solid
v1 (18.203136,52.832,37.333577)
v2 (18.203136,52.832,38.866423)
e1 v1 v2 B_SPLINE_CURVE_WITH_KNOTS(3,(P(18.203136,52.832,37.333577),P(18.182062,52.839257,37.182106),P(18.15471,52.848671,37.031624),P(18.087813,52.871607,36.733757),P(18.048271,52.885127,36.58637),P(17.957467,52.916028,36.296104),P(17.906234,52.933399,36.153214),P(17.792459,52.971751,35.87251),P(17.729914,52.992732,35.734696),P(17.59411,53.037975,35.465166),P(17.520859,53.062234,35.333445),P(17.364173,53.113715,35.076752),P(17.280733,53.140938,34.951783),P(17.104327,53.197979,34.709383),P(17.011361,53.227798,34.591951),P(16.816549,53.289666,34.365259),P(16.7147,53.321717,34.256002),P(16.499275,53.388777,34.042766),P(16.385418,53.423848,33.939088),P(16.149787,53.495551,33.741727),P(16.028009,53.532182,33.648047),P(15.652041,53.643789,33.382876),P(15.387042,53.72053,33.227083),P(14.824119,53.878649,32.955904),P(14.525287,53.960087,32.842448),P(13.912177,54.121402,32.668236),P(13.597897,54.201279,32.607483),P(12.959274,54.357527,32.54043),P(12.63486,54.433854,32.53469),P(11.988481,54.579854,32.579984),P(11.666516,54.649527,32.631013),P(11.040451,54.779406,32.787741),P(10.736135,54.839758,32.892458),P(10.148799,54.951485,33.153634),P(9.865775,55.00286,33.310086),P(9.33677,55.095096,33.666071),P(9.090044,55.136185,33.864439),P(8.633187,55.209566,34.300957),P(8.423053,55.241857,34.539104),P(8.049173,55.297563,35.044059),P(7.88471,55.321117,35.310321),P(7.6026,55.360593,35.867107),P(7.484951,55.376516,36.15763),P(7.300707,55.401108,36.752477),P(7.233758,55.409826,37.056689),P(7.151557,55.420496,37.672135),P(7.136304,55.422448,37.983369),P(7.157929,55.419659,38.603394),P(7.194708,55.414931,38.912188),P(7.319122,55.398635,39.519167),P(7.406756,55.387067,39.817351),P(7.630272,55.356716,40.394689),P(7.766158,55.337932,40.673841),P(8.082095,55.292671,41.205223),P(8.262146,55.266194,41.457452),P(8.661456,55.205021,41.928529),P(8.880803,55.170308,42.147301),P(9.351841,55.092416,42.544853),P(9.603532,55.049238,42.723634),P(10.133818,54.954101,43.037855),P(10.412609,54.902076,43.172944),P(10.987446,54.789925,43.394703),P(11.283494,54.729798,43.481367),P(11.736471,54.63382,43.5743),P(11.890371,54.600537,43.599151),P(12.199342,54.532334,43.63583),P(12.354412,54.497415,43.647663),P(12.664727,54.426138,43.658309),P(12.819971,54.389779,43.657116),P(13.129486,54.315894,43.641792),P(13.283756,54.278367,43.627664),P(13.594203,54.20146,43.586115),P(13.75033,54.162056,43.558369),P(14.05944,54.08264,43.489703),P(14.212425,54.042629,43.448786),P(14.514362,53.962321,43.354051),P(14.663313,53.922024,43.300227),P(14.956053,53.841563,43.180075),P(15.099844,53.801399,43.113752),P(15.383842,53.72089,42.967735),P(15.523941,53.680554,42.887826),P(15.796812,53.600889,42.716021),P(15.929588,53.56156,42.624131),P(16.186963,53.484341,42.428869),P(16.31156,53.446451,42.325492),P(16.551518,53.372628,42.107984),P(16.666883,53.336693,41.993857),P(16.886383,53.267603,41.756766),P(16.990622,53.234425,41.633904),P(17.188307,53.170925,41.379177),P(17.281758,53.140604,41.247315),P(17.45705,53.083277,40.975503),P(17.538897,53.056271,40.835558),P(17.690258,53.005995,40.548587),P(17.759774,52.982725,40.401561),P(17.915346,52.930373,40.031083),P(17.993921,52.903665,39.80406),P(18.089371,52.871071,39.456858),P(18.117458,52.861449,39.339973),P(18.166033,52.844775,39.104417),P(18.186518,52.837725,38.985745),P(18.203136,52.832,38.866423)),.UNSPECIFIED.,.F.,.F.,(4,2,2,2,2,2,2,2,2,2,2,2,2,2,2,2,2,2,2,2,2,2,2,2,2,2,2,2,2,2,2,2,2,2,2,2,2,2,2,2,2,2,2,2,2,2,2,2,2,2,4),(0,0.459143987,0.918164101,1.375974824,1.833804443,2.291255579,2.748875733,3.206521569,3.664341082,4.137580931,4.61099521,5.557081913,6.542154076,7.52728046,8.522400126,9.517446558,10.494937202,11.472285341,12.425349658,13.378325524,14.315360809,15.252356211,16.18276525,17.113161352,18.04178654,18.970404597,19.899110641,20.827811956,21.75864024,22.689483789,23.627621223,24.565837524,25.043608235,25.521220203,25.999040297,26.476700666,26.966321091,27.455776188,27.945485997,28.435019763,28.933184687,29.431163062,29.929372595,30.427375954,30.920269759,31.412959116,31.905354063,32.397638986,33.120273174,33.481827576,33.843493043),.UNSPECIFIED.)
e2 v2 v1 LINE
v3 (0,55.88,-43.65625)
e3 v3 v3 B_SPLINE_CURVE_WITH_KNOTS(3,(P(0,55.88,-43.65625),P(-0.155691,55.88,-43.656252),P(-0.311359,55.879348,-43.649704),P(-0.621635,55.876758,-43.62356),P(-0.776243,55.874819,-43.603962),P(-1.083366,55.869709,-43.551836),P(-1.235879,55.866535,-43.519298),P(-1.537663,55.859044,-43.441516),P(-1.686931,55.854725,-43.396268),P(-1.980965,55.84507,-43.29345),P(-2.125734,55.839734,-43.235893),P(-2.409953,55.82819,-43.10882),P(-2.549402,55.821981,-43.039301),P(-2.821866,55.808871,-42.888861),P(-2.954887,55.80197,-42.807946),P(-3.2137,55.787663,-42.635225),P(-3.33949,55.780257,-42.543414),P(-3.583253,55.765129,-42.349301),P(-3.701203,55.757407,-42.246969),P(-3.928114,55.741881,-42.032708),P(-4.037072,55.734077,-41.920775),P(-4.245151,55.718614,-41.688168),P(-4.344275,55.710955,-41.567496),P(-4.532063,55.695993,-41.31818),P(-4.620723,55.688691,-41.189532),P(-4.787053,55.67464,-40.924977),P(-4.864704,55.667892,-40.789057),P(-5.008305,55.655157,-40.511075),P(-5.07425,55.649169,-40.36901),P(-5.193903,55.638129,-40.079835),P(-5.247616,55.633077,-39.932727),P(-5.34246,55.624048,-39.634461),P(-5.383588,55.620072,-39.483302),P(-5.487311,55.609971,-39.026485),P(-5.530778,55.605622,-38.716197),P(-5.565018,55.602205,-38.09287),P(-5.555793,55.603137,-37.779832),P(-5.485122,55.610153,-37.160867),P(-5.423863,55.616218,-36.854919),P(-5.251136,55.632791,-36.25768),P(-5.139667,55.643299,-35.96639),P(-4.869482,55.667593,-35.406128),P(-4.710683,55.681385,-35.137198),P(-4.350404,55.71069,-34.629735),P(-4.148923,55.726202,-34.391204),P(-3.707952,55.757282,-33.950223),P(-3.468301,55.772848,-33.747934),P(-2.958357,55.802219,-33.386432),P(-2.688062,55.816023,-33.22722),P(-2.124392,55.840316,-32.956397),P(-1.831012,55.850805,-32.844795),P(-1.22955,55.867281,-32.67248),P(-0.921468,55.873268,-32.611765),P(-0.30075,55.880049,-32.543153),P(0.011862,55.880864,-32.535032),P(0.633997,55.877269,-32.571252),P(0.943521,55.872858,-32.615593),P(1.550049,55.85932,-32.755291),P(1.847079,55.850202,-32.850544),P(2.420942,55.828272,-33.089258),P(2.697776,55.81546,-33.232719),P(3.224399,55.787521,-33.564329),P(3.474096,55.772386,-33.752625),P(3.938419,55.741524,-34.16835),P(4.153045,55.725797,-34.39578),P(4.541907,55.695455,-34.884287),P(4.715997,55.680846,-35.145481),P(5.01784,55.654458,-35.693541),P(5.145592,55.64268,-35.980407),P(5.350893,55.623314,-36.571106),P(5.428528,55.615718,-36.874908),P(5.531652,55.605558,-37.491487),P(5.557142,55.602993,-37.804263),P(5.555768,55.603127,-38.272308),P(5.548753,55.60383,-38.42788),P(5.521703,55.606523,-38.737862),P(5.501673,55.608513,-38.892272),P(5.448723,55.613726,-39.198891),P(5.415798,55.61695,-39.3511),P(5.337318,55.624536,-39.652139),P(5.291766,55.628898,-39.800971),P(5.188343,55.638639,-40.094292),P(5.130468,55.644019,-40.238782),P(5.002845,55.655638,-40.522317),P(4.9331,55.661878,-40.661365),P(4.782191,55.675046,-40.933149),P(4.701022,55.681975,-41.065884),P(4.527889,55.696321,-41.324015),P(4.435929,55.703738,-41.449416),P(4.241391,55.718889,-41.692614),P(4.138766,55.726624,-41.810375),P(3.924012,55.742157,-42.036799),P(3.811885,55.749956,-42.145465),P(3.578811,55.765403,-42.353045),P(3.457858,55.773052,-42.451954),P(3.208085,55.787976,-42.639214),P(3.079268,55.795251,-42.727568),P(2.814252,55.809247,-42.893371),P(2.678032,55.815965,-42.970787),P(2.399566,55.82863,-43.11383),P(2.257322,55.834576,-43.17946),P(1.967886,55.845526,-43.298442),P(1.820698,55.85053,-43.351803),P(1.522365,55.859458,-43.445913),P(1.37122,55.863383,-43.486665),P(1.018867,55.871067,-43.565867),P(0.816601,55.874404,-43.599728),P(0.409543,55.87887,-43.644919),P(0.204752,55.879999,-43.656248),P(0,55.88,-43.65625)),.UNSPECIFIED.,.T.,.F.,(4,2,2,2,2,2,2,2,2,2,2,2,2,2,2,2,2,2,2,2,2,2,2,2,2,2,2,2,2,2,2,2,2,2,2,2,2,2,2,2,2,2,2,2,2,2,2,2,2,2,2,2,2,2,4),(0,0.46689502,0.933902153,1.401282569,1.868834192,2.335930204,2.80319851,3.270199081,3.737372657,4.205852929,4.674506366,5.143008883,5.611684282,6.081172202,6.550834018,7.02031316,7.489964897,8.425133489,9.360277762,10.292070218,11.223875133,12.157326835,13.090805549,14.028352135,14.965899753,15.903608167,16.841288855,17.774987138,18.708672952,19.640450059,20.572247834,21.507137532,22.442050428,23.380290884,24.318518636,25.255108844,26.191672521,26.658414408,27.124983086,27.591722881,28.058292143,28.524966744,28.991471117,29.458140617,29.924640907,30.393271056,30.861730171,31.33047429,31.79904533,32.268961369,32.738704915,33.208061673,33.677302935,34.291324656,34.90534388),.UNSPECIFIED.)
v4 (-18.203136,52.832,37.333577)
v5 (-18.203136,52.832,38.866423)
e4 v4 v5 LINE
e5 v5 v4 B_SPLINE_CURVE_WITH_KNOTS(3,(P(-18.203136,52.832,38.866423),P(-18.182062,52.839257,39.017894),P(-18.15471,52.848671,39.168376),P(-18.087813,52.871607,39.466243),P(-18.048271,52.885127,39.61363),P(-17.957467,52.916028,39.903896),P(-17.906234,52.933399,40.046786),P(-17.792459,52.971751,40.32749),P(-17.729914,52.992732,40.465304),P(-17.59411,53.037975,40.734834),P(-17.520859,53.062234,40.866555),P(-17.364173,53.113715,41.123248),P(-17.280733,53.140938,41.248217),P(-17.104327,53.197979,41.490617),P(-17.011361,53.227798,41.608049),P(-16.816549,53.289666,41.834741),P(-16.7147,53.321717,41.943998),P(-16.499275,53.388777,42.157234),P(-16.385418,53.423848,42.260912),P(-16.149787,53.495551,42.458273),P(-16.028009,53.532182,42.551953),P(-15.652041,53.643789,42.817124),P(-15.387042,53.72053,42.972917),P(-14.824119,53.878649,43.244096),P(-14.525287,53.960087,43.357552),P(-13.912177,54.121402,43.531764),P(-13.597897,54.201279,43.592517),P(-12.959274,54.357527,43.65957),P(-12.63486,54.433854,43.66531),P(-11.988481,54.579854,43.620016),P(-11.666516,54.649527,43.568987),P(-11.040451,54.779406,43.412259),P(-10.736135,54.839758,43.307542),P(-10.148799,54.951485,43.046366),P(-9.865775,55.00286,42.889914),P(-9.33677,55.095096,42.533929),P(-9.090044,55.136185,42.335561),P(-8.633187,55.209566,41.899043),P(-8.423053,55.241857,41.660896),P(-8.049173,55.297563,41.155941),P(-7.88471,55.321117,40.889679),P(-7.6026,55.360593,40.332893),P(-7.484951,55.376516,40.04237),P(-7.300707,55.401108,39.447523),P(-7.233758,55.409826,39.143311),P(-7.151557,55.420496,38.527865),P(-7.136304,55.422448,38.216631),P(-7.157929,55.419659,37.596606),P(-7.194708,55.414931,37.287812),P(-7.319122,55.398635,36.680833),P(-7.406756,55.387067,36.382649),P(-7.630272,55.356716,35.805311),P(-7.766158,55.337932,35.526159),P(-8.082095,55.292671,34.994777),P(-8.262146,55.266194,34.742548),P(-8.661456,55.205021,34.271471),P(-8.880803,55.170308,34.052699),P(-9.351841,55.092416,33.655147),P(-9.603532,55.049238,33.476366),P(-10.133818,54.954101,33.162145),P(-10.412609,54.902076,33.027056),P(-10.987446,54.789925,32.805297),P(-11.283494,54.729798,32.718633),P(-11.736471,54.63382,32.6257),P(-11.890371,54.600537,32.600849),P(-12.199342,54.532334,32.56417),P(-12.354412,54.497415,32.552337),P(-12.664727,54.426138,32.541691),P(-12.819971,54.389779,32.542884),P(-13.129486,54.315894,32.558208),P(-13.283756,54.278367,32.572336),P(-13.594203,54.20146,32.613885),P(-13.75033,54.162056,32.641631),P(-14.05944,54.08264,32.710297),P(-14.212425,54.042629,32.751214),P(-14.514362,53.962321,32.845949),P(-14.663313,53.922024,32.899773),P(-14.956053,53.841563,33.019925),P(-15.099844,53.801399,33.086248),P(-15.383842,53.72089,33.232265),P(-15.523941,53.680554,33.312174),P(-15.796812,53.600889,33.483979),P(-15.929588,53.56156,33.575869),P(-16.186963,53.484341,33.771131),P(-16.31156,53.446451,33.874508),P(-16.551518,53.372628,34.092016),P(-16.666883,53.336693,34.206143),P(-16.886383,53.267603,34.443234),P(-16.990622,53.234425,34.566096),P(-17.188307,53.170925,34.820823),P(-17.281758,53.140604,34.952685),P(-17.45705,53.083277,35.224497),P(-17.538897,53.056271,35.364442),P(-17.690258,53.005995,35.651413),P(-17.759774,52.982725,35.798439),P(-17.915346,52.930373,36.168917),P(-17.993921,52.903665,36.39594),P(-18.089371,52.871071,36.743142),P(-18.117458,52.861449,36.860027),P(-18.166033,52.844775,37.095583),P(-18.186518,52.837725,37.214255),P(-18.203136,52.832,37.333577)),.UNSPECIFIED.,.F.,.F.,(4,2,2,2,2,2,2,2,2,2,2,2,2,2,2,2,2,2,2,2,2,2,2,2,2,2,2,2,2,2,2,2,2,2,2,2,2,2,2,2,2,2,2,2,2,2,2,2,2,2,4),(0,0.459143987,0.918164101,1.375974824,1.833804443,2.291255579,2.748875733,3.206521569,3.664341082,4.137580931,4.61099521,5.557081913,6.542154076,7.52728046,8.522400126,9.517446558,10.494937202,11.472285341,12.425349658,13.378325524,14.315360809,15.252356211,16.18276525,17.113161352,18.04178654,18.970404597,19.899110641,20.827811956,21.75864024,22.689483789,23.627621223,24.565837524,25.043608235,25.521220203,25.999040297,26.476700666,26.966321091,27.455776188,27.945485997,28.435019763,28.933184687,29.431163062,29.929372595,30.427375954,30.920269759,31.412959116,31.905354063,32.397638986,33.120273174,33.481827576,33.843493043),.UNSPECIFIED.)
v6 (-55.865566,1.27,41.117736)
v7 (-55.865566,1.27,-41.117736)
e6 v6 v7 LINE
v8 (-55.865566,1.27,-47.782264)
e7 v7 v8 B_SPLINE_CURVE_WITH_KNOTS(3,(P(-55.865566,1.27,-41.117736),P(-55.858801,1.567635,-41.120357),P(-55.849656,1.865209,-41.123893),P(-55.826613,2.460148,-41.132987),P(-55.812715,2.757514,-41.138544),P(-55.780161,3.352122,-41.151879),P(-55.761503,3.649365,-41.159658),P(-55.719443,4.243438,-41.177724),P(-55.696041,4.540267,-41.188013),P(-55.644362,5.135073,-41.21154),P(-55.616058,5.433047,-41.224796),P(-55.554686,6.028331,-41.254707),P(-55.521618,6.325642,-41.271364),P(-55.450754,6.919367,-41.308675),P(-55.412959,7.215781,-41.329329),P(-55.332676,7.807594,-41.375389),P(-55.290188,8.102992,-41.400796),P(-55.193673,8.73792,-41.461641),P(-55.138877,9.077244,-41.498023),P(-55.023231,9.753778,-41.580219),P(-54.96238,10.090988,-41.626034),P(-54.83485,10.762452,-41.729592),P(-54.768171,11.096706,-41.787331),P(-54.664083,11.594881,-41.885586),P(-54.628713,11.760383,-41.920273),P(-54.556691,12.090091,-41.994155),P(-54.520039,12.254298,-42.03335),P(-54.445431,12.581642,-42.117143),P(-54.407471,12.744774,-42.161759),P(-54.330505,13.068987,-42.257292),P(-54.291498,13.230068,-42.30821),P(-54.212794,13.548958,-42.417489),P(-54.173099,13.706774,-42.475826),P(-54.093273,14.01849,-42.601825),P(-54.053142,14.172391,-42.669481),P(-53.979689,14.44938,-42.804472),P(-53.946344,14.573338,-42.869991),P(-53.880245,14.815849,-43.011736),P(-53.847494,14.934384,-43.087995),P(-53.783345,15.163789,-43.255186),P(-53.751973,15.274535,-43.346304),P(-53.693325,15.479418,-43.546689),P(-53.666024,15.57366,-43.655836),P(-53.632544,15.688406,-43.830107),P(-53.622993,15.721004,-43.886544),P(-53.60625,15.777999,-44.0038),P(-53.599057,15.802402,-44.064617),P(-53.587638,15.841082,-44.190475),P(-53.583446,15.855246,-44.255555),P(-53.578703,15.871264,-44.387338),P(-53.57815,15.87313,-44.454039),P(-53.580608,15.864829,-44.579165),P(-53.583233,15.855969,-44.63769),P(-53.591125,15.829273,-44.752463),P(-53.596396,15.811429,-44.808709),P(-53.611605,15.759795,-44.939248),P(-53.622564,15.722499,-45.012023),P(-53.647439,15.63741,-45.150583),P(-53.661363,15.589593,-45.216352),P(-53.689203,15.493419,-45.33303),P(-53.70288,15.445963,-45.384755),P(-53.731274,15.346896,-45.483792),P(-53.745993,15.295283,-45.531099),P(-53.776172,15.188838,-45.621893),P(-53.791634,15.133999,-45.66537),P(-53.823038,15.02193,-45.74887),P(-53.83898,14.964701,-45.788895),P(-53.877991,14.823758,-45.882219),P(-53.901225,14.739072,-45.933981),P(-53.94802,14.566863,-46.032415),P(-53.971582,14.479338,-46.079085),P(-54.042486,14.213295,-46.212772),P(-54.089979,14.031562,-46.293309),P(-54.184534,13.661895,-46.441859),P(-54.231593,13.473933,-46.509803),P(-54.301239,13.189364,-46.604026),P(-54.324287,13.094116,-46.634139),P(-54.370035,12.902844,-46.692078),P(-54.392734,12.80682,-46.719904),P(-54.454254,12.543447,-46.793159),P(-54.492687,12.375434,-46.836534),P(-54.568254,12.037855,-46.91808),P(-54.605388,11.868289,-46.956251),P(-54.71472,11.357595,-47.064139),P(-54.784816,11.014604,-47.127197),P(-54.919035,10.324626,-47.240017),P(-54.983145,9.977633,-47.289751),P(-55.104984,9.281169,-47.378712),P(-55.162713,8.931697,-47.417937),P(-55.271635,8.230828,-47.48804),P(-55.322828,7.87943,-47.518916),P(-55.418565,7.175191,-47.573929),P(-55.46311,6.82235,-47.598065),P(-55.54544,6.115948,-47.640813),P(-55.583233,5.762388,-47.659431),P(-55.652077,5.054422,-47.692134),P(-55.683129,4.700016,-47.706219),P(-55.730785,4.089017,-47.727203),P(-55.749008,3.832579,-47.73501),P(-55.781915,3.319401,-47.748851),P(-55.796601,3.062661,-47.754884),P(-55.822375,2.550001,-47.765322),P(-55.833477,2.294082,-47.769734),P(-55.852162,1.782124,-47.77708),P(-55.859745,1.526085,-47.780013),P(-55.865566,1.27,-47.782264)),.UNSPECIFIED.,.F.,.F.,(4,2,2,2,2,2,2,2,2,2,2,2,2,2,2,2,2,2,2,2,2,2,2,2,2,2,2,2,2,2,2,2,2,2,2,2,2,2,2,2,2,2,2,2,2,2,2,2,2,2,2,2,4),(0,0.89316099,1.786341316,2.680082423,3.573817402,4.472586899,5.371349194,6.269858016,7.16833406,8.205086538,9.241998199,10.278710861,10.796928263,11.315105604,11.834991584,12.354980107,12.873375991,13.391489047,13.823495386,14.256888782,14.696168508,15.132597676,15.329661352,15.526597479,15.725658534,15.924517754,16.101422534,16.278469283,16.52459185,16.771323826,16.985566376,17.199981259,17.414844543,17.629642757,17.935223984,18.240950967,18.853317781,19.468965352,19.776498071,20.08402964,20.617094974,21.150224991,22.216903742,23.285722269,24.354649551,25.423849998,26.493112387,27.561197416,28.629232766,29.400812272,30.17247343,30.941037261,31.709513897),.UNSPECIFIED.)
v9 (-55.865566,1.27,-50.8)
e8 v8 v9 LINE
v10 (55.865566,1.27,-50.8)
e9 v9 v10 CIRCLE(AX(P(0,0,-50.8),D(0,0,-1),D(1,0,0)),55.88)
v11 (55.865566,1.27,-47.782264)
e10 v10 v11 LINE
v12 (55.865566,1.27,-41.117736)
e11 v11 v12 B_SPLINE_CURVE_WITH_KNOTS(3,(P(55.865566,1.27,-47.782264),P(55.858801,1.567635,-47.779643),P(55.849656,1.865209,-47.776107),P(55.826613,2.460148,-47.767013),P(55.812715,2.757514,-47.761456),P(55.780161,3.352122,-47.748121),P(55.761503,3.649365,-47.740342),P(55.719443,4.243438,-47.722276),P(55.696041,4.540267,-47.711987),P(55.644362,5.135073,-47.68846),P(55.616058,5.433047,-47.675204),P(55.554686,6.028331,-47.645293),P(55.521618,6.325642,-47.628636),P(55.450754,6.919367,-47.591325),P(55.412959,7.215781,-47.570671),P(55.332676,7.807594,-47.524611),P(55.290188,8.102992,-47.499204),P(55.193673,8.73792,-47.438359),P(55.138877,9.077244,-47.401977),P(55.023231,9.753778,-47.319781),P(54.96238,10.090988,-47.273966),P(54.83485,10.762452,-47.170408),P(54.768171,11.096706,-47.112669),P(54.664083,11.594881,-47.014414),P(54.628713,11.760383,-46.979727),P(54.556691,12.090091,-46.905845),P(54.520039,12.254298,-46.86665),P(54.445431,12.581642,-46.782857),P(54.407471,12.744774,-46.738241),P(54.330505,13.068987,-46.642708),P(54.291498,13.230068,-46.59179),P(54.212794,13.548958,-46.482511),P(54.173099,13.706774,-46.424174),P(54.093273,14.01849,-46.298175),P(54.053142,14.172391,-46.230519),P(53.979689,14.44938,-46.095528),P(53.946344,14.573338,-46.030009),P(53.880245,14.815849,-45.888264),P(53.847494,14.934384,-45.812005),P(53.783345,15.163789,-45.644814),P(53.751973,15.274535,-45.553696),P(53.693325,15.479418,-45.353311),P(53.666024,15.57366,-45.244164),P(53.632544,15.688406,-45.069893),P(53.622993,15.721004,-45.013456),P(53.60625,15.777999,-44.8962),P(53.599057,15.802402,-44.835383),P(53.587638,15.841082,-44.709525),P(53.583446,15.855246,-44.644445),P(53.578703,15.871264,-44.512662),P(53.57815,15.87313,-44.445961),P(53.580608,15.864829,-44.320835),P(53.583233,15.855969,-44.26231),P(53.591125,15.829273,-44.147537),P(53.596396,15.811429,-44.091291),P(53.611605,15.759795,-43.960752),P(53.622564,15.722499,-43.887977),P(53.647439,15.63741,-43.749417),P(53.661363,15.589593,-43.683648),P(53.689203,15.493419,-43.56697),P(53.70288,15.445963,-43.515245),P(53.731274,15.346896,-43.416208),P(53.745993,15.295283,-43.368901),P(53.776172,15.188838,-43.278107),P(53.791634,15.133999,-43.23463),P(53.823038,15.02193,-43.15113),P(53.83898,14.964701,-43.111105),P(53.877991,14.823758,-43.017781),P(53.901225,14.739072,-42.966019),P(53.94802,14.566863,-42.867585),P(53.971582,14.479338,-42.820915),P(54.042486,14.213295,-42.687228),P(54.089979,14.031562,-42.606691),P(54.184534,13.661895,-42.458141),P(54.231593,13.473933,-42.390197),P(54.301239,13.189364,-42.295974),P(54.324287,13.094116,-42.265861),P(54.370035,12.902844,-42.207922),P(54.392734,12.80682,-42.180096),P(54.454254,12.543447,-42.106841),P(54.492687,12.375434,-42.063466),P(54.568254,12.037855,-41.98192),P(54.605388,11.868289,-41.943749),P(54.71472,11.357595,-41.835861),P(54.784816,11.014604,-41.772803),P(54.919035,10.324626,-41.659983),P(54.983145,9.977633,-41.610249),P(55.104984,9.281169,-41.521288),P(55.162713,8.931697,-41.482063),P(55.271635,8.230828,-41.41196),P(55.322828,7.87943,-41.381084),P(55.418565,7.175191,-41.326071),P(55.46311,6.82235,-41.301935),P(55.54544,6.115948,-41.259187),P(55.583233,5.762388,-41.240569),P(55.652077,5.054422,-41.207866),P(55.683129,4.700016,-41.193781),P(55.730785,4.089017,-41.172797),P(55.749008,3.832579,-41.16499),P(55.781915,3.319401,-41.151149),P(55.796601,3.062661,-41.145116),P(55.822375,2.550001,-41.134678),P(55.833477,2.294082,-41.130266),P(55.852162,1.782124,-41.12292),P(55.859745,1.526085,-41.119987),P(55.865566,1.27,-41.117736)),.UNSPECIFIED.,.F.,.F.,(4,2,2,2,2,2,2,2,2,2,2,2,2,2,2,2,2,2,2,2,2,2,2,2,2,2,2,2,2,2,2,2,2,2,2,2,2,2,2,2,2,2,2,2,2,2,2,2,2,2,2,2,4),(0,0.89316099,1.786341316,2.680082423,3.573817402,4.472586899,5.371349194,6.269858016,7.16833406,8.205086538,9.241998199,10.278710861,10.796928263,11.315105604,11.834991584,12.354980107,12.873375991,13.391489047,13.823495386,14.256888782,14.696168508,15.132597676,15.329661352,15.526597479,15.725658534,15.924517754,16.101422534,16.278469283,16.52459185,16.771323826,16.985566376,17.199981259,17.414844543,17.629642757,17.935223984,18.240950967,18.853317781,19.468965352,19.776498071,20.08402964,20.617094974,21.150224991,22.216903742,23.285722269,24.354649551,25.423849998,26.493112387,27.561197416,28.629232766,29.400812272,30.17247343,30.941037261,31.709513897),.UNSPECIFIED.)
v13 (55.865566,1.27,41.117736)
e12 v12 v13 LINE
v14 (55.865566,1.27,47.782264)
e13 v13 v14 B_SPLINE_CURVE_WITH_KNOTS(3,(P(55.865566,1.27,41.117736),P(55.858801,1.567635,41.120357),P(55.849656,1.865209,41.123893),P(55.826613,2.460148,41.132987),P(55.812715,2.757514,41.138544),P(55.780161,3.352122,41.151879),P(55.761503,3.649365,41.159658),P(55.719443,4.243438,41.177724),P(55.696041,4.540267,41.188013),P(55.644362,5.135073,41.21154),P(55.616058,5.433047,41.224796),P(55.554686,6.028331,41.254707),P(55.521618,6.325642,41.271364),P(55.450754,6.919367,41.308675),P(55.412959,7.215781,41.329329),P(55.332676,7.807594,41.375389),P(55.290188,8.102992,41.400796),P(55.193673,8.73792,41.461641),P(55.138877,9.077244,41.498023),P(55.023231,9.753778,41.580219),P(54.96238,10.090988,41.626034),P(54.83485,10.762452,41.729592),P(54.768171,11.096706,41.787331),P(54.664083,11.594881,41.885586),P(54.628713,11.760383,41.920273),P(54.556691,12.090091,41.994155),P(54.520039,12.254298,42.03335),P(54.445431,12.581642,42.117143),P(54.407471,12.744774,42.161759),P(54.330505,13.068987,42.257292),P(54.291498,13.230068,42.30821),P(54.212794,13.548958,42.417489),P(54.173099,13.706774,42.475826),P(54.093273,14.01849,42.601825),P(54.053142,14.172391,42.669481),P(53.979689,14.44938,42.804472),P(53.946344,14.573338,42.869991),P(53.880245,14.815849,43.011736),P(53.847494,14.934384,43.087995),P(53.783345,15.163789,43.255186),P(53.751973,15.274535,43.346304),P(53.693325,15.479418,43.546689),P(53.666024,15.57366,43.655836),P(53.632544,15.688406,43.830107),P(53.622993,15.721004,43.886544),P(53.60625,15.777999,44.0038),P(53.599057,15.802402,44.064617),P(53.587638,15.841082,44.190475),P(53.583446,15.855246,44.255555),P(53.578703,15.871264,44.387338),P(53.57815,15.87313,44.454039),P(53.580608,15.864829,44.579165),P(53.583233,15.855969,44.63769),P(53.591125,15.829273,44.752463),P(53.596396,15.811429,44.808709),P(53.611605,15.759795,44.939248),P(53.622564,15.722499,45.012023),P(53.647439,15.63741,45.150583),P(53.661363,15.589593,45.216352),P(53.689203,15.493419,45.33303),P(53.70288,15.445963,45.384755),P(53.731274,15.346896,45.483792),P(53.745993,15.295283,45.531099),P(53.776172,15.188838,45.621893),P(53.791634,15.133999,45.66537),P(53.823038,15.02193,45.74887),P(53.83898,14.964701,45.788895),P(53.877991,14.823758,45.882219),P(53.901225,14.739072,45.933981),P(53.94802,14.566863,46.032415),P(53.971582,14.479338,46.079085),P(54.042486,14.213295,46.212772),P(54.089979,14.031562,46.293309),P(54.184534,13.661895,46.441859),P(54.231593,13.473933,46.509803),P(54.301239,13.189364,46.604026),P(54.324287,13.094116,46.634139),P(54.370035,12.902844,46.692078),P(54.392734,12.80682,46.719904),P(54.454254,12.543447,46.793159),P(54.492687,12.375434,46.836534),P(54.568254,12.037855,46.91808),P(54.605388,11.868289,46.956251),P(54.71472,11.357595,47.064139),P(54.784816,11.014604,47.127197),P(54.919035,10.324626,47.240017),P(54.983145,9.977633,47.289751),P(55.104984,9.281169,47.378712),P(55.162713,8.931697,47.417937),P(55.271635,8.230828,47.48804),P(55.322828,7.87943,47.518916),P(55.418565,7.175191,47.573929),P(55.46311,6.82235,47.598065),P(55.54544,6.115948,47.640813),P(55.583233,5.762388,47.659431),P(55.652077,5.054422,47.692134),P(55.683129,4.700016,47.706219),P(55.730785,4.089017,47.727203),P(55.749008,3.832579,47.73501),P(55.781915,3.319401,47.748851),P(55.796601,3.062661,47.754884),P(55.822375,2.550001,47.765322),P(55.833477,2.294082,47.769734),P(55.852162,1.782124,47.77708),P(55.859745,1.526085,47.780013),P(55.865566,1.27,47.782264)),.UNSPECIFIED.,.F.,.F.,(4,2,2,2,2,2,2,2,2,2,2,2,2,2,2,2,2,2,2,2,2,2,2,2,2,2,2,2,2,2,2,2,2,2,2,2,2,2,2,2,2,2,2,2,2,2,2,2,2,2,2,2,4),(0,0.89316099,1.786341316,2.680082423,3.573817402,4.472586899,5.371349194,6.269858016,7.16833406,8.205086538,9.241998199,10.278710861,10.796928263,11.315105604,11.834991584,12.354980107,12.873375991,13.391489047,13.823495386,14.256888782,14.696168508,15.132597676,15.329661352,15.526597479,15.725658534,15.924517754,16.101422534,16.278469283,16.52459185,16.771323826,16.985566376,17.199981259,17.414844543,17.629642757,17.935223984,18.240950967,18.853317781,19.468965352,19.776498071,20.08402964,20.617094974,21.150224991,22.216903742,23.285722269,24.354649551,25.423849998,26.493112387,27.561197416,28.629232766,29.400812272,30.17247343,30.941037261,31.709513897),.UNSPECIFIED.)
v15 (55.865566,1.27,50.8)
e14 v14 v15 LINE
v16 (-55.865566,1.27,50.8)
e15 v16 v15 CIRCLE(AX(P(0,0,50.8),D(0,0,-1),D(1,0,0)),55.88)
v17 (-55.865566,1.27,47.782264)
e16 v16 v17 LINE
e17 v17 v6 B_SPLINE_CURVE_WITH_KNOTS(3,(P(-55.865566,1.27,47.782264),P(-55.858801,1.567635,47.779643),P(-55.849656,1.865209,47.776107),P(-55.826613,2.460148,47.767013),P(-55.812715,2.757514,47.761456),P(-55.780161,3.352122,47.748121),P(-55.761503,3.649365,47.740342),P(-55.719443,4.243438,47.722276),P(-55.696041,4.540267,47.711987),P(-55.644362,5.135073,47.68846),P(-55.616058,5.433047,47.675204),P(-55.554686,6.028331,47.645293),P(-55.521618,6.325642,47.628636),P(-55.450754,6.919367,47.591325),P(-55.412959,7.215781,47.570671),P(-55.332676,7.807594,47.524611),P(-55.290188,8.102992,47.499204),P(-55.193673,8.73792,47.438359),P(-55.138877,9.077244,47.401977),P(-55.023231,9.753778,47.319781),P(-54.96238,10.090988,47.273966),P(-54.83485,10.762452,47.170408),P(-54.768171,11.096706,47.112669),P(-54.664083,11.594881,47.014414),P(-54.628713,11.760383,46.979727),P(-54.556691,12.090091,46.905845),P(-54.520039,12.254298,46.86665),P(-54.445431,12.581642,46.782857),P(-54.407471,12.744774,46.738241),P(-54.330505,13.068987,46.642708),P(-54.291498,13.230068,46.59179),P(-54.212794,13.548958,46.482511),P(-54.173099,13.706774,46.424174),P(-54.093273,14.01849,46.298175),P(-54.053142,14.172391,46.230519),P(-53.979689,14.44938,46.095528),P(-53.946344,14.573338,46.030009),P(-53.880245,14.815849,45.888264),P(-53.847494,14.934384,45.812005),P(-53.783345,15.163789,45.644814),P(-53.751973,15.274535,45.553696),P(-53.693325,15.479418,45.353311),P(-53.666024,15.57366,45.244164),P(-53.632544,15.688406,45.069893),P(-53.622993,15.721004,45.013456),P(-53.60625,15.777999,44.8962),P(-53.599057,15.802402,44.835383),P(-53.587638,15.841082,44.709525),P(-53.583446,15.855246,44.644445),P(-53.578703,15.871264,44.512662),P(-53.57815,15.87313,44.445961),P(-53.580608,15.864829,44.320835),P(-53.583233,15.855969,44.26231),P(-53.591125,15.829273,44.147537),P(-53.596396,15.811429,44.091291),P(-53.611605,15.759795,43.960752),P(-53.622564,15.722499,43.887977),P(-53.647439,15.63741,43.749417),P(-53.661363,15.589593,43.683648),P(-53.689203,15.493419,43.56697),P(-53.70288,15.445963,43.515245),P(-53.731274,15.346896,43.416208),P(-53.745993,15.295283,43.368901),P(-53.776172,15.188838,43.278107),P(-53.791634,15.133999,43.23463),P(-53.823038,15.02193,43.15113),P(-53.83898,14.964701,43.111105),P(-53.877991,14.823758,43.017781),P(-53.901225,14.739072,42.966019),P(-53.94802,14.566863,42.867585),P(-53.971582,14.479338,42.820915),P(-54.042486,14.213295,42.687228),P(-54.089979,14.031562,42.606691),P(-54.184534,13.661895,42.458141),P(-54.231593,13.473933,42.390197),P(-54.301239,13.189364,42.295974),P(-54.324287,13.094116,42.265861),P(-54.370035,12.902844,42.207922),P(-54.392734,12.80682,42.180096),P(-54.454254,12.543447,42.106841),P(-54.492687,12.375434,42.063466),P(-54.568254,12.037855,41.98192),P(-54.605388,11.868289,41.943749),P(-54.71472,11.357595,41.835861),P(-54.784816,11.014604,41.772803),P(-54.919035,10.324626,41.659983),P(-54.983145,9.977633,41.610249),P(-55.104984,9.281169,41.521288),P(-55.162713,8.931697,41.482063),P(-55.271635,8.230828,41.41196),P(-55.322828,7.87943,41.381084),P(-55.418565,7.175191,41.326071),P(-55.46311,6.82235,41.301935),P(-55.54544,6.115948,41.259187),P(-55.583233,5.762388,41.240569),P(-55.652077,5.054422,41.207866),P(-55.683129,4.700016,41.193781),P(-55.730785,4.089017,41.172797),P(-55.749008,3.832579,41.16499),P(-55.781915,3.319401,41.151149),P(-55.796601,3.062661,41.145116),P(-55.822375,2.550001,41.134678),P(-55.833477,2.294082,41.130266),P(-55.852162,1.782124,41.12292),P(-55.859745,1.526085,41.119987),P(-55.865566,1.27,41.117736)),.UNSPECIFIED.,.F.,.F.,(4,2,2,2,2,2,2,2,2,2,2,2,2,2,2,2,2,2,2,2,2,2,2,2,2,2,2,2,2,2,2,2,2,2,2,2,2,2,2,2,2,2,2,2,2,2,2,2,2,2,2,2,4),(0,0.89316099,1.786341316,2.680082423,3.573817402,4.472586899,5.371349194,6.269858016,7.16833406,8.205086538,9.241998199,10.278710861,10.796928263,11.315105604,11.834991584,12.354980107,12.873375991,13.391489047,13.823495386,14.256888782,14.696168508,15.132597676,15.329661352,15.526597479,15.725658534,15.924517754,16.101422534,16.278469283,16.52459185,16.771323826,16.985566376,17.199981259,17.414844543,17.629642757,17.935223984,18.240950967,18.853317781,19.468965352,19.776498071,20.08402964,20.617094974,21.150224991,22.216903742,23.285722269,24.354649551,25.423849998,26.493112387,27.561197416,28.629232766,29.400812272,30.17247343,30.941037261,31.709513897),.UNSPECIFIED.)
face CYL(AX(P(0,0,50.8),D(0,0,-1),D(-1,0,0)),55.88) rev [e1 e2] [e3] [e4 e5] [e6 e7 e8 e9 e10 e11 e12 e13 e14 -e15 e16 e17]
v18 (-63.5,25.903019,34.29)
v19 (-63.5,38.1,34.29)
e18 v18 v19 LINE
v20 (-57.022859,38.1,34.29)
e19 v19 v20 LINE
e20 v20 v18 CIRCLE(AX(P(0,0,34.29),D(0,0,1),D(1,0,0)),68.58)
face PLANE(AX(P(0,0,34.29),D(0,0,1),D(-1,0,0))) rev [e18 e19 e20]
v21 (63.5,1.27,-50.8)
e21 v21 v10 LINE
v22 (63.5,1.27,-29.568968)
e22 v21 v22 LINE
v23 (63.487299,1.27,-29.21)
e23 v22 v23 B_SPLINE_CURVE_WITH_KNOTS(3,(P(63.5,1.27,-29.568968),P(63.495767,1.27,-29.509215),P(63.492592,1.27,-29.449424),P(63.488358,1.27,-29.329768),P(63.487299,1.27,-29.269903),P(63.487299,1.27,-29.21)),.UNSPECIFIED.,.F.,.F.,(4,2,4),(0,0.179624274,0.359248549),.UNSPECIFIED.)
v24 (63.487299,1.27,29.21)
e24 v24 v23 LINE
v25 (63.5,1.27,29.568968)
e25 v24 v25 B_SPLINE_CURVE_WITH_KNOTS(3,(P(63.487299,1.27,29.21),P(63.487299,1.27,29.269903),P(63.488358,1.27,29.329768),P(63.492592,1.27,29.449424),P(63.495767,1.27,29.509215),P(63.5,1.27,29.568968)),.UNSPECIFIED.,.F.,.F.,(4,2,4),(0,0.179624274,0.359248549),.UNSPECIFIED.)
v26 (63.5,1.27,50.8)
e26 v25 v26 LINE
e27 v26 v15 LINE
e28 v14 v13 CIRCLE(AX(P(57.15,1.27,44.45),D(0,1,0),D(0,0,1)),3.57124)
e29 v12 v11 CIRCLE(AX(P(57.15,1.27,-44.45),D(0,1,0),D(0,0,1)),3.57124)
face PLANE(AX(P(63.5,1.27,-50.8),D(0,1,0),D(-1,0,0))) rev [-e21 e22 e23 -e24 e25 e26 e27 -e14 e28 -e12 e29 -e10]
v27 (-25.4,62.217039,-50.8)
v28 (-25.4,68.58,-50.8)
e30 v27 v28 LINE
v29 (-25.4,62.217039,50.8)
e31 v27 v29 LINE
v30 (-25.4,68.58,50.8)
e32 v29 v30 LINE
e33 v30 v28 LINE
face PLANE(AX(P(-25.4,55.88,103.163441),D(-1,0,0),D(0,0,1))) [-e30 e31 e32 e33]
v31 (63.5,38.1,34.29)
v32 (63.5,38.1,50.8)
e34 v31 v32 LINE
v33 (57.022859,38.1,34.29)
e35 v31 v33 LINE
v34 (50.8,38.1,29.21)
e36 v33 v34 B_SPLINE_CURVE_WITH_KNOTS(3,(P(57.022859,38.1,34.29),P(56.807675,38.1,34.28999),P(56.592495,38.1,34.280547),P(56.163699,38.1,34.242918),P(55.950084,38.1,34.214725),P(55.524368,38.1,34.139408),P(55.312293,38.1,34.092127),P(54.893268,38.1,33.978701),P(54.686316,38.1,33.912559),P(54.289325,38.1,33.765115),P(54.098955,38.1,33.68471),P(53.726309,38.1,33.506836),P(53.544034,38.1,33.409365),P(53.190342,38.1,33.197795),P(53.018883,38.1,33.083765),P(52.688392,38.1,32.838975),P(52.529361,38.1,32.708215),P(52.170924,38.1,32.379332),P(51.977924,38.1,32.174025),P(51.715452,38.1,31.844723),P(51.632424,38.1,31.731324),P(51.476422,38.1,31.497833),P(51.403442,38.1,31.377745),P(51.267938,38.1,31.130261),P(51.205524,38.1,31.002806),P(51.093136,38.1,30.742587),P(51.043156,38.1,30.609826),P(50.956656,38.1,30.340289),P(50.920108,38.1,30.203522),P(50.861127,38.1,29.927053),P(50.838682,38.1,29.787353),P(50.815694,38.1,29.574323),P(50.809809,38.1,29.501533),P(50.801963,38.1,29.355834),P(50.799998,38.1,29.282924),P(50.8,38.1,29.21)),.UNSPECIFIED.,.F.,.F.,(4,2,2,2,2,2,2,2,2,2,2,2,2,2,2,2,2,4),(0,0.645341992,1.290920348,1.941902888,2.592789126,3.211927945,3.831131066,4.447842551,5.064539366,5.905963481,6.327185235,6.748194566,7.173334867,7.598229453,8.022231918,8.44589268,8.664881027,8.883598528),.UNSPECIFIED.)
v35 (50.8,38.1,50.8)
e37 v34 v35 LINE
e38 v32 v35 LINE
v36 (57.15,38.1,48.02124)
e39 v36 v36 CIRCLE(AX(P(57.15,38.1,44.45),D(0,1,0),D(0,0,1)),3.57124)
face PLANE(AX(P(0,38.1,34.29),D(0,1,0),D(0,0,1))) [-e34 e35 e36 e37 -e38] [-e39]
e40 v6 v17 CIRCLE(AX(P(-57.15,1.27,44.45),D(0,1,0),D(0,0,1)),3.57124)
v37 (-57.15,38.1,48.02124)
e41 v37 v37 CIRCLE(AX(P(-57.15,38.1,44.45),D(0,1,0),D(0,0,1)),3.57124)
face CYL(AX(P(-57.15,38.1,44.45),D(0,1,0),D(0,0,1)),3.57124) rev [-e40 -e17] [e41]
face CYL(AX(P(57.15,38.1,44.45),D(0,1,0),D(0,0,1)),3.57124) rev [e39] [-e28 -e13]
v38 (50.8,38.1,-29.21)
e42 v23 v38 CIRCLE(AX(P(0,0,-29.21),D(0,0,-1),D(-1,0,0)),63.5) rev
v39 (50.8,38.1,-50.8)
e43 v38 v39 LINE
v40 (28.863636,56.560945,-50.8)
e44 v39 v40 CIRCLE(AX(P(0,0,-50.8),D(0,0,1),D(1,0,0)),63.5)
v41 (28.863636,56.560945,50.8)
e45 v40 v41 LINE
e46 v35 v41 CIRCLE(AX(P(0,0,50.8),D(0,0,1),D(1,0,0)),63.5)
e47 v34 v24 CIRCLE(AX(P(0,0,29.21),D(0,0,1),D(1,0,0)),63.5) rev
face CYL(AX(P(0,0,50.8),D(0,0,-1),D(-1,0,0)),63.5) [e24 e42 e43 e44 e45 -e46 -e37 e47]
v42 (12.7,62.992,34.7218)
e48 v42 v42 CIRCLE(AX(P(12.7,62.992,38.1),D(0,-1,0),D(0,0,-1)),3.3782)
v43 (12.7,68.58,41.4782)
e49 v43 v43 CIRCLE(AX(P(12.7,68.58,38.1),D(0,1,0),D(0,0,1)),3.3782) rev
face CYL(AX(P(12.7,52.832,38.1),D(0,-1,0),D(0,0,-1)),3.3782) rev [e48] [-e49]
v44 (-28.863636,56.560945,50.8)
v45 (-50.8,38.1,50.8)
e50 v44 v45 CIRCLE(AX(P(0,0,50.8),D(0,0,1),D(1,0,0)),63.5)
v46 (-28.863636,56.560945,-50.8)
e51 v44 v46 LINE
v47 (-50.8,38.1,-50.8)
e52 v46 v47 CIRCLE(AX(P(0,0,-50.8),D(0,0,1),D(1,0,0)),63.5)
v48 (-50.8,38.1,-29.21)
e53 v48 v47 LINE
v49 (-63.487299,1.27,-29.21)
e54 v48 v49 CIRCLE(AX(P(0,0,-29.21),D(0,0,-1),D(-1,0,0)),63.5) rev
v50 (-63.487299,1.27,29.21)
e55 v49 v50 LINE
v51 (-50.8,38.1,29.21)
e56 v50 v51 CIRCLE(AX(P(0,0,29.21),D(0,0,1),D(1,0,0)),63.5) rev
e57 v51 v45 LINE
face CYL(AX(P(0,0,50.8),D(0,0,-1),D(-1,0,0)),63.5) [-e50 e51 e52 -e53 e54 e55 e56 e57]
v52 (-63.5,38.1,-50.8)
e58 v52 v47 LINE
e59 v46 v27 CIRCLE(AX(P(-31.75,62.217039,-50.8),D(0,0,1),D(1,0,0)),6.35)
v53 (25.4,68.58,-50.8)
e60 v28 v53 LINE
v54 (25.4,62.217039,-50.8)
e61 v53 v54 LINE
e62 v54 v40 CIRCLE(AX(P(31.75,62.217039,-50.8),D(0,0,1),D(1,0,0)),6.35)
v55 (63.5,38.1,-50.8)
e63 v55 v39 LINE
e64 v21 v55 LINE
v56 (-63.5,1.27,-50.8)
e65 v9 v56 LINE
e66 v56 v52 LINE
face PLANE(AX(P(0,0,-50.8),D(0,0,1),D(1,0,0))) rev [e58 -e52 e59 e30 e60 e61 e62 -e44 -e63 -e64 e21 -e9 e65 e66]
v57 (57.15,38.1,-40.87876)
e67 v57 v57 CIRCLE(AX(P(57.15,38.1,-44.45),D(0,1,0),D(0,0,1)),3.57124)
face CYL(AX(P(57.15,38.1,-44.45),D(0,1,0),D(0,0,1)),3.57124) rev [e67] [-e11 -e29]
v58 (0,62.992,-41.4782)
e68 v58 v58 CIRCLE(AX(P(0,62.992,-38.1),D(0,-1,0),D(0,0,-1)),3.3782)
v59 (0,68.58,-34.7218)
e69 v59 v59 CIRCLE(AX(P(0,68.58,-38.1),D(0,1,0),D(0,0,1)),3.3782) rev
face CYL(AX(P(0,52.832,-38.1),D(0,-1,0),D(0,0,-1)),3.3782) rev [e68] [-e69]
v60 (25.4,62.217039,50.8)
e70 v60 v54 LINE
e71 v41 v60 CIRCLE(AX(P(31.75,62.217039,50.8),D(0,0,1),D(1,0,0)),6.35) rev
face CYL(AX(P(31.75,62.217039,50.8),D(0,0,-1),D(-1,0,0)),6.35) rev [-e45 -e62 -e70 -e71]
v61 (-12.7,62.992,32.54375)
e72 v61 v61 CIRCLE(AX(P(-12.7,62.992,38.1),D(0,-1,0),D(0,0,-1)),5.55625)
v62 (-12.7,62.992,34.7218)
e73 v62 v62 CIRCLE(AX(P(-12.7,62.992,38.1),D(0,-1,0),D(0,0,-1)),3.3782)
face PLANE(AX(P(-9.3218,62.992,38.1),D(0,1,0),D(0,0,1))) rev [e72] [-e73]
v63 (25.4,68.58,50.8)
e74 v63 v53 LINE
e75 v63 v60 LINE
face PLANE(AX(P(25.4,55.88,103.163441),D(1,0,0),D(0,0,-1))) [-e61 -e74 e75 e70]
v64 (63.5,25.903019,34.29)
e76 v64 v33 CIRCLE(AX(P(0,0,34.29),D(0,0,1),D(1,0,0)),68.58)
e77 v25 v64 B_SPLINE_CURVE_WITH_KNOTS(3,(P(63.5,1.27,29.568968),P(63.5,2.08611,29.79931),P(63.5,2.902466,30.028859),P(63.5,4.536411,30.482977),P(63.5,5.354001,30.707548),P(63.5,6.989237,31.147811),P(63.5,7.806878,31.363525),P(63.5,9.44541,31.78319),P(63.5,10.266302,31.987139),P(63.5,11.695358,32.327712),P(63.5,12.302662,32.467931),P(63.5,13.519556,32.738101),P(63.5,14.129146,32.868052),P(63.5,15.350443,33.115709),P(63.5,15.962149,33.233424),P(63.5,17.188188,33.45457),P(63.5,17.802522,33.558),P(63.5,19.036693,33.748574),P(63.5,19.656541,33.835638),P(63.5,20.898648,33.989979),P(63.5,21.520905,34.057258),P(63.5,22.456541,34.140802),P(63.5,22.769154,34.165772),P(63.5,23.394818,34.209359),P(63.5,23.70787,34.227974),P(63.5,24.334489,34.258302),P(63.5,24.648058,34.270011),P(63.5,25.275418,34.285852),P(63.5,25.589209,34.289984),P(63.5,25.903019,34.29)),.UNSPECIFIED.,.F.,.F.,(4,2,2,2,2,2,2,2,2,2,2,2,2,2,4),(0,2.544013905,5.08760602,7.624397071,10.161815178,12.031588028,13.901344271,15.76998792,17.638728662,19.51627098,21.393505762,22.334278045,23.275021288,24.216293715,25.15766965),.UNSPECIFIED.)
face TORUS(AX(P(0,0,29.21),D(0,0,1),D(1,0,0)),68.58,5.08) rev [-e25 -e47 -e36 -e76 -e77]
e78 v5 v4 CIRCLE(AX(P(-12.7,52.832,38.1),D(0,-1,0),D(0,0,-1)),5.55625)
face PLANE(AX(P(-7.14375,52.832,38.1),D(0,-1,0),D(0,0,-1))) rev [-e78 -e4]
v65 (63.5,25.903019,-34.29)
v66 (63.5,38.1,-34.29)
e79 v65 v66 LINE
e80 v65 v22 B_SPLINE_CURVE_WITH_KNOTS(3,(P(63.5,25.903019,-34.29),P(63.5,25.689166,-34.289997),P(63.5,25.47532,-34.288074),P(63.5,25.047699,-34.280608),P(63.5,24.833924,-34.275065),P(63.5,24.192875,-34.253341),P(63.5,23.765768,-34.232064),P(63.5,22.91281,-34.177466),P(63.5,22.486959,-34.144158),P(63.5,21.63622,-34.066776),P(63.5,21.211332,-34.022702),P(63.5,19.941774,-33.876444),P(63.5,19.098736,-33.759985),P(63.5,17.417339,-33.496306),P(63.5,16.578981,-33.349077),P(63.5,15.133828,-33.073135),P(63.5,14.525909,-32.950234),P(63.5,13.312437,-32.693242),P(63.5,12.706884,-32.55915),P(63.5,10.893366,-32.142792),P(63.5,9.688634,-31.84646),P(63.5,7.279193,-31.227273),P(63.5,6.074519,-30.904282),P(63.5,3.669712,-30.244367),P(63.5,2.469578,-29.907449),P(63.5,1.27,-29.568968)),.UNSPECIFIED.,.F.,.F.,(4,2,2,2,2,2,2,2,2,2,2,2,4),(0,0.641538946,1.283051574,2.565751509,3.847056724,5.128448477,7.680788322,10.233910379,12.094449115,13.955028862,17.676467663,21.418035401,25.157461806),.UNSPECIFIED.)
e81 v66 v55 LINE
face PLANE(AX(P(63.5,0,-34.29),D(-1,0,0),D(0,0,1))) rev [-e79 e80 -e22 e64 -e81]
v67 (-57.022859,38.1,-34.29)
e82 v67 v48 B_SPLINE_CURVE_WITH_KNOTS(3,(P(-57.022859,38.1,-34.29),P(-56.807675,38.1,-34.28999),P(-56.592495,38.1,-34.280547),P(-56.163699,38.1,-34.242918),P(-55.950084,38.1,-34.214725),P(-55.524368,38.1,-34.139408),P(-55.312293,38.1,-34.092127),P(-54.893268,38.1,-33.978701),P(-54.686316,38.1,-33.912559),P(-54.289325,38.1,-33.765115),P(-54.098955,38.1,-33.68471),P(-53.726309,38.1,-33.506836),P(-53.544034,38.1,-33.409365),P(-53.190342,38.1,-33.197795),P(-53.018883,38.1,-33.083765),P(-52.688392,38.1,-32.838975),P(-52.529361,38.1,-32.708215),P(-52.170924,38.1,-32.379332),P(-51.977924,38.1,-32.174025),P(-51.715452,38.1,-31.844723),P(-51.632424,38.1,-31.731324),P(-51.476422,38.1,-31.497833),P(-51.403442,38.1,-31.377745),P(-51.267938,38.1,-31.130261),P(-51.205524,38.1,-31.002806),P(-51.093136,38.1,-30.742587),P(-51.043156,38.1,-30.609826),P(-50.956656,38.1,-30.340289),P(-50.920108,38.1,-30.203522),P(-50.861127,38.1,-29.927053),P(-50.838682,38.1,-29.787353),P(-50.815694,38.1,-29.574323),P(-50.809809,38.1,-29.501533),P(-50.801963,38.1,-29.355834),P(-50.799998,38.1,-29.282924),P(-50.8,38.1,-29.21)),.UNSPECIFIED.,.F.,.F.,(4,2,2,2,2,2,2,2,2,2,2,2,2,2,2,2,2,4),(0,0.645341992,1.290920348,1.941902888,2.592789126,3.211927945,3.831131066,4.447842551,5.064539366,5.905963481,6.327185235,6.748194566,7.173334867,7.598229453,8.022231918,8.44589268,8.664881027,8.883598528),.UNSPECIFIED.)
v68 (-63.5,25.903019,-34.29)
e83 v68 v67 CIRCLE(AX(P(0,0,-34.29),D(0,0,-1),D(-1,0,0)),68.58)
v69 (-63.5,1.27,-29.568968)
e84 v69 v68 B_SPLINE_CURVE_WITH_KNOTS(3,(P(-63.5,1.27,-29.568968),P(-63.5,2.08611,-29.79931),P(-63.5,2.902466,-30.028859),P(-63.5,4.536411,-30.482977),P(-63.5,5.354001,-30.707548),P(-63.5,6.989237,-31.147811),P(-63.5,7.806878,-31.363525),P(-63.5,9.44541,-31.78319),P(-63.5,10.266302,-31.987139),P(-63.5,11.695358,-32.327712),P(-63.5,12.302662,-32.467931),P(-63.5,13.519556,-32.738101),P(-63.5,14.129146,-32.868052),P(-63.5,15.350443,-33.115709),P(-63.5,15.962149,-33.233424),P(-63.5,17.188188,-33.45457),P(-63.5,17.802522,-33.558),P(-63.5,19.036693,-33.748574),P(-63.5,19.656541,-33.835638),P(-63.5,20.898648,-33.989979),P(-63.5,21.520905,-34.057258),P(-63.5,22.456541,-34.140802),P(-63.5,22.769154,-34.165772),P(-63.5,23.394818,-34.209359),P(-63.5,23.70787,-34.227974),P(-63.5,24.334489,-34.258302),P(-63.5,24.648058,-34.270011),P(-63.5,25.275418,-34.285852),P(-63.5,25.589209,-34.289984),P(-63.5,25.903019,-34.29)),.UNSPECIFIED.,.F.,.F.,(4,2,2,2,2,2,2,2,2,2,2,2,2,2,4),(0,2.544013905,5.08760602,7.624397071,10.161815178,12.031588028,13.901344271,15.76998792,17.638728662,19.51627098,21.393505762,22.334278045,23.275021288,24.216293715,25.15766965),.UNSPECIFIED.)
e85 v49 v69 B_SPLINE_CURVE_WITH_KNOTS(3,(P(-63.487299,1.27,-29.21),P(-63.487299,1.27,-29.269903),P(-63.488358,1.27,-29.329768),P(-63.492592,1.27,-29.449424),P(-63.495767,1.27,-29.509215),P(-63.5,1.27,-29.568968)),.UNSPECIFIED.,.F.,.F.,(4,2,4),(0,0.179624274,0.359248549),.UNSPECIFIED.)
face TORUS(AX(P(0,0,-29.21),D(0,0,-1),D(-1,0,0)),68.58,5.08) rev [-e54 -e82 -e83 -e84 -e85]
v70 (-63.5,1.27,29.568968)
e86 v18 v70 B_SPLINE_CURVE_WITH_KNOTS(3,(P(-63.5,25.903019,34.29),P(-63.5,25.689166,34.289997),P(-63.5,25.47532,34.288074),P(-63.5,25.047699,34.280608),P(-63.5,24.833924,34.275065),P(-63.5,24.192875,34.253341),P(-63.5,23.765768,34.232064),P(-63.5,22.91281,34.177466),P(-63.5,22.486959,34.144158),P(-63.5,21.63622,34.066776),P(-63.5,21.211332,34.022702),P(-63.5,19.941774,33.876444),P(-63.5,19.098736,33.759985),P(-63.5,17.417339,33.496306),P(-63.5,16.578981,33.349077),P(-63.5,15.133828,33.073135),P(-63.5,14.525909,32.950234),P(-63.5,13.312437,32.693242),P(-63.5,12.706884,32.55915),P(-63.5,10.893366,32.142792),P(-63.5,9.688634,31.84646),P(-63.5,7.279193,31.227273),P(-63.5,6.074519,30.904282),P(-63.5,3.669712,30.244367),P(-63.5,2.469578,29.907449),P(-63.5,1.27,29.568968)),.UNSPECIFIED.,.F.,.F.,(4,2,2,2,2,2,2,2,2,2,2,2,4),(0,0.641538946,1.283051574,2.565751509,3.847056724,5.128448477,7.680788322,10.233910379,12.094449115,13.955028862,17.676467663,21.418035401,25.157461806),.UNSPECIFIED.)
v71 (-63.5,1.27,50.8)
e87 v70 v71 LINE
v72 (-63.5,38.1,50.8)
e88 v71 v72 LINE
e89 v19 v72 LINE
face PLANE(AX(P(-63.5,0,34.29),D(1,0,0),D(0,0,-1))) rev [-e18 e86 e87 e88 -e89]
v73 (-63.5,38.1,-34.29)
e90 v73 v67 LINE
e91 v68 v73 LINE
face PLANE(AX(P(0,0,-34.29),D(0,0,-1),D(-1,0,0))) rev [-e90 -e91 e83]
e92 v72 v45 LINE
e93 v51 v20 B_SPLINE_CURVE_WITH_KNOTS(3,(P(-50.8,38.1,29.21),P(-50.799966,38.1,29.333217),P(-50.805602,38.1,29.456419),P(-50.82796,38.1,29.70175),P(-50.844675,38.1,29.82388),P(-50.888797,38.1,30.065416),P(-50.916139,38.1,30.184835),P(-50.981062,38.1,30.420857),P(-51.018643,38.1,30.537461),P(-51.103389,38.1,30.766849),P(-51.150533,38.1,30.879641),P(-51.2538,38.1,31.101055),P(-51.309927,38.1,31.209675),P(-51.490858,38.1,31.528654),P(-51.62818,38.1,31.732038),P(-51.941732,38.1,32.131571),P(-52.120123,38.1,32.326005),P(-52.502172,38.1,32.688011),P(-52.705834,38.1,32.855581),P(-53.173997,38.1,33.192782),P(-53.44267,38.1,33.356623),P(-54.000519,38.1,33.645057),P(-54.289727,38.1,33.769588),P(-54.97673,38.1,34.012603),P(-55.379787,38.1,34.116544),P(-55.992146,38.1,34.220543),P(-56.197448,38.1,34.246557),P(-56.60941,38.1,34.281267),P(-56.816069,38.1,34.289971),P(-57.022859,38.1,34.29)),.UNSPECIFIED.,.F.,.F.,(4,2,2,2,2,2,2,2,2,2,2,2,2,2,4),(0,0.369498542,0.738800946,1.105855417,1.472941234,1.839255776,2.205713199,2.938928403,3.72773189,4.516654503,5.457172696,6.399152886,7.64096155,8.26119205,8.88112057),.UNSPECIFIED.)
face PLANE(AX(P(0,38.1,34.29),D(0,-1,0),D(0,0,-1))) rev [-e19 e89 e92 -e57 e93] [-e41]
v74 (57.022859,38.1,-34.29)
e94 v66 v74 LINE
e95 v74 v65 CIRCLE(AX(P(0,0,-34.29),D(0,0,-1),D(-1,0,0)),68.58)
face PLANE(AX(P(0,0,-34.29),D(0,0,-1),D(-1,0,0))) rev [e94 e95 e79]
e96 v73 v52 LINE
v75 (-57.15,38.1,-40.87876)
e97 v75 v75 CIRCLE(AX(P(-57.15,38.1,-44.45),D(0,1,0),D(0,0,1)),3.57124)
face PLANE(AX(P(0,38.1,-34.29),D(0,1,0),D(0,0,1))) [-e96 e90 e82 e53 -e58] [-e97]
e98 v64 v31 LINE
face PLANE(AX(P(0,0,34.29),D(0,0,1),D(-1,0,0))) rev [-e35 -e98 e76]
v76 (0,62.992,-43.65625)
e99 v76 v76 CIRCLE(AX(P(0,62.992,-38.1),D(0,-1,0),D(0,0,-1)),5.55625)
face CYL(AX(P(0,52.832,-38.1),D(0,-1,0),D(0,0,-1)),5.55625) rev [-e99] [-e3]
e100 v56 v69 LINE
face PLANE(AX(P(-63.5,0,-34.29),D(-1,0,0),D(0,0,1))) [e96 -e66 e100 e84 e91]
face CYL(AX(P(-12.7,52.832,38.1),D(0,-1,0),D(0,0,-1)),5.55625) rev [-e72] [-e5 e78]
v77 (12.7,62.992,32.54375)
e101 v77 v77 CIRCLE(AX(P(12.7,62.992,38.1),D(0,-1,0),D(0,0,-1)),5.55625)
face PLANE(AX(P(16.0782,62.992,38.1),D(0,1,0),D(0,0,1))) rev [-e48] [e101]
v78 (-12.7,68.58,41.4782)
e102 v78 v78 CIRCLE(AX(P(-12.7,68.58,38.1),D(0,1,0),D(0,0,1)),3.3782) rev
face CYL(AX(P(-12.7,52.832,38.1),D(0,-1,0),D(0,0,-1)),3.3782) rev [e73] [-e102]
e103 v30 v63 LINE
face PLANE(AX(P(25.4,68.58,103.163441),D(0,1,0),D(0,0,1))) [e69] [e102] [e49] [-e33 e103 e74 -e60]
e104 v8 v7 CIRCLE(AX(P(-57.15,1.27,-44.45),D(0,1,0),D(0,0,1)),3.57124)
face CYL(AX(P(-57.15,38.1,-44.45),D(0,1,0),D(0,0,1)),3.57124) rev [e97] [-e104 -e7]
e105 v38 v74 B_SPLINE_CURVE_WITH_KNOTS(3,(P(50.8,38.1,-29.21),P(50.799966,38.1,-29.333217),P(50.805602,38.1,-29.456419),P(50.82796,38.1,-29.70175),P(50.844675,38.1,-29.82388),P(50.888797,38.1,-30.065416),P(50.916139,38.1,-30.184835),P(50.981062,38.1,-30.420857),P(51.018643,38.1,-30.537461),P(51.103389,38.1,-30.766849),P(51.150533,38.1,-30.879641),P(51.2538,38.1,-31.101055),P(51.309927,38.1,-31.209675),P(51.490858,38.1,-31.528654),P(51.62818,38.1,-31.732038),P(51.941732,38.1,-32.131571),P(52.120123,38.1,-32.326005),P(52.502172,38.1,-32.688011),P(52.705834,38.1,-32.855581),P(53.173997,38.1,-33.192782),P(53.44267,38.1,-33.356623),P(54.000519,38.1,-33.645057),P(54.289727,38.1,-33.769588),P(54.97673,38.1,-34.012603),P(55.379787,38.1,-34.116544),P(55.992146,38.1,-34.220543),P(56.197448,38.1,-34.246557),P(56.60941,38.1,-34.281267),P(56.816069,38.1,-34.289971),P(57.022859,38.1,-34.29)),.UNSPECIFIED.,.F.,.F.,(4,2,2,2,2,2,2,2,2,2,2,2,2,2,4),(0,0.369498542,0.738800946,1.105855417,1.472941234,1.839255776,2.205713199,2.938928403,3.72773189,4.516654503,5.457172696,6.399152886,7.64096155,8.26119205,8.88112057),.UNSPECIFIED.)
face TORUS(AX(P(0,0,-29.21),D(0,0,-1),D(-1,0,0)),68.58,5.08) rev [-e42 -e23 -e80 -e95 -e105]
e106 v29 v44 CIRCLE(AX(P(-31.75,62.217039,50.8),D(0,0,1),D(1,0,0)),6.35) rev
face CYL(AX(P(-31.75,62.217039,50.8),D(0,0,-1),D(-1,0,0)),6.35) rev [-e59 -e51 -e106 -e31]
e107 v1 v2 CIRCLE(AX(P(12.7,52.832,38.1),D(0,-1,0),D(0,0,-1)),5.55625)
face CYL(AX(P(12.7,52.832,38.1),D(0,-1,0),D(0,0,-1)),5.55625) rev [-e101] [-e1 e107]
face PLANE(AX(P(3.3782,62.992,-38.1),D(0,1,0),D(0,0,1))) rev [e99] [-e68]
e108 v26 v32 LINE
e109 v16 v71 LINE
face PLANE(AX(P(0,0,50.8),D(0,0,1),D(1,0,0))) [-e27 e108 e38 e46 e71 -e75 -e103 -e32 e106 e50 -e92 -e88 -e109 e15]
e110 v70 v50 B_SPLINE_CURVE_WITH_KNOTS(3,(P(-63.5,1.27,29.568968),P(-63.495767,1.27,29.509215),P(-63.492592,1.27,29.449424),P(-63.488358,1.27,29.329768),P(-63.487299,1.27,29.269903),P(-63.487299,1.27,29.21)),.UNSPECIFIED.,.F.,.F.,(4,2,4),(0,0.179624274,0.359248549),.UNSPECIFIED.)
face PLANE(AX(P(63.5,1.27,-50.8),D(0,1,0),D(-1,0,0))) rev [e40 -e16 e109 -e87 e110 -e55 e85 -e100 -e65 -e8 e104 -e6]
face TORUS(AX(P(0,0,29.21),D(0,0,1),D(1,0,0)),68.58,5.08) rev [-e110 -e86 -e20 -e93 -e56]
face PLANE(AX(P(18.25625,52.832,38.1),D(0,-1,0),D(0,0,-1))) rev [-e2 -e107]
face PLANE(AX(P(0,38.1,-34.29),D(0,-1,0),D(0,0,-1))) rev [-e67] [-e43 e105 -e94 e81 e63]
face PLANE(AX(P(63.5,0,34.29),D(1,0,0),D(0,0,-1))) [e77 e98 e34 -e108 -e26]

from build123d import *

# Parameters (mm, degrees)
BOSS_EXTRUDE1_DEPTH                          = 50.8
BOSS_EXTRUDE2_START                          = -16.51
BOSS_EXTRUDE2_DEPTH                          = 16.51
SKETCH4_W                                    = 127
SKETCH4_H                                    = 1.27
CUT_EXTRUDE1_DEPTH                           = 136.598893801
F_1_4_CLEARANCE_HOLE1_D                      = 7.14248
FILLET1_R                                    = 5.08
SKETCH7_W                                    = 50.8
SKETCH7_H                                    = 12.7
BOSS_EXTRUDE3_DEPTH                          = 101.6
FILLET2_R                                    = 6.35
CBORE_START                                  = 52.832
CBORE_FOR_1_4_SOCKET_HEAD_CAP_SCREW1_OUT_R   = 5.55625
CBORE_FOR_1_4_SOCKET_HEAD_CAP_SCREW1_DEPTH   = 10.16
CBORE_START_2                                = 62.992
CBORE_FOR_1_4_SOCKET_HEAD_CAP_SCREW1_2_O_R   = 3.3782
CBORE_FOR_1_4_SOCKET_HEAD_CAP_SCREW1_2_DEPTH = 5.588


# Read off the part's stored shape, not the designer's step: CBORE for 1/4 Socket Head Cap Screw1
with BuildPart() as part:
    # Sketch1 → Boss-Extrude1 (new, symmetric)
    with BuildSketch(Plane.XY):
        with BuildLine():
            Line((55.88, 0), (63.5, 0))
            ThreePointArc((63.5, 0), (0, 63.5), (-63.5, 0))
            Line((-63.5, 0), (-55.88, 0))
            ThreePointArc((-55.88, 0), (0, 55.88), (55.88, 0))
        make_face()
    extrude(amount=BOSS_EXTRUDE1_DEPTH, both=True)

    # Sketch2 → Boss-Extrude2 (add)
    with BuildSketch(Plane(origin=(0, 0, -50.8), x_dir=(-1, 0, 0), z_dir=(0, 0, -1)).offset(BOSS_EXTRUDE2_START)):
        with BuildLine():
            Line((-63.5, 38.1), (-63.5, 0))
            ThreePointArc((-63.5, 0), (-60.241389426, 20.080463142), (-50.8, 38.1))
            Line((-50.8, 38.1), (-63.5, 38.1))
        make_face()
        with BuildLine():
            Line((63.5, 38.1), (50.8, 38.1))
            ThreePointArc((50.8, 38.1), (60.241389426, 20.080463142), (63.5, 0))
            Line((63.5, 0), (63.5, 38.1))
        make_face()
    boss_extrude2 = extrude(amount=BOSS_EXTRUDE2_DEPTH)

    # Mirror1: Boss-Extrude2 across plane
    add(boss_extrude2.mirror(Plane.XY))

    # Sketch4 → Cut-Extrude1 (cut, through all)
    with BuildSketch(Plane.XY.offset(50.8)):
        with Locations((0, 0.635)):
            Rectangle(SKETCH4_W, SKETCH4_H)
    extrude(amount=-CUT_EXTRUDE1_DEPTH, mode=Mode.SUBTRACT)

    # 1/4 Clearance Hole1 (through all)
    with Locations(Plane(origin=(-57.15, 38.1, -44.45), x_dir=(0, 0, 1), z_dir=(0, 1, 0))):
        with Locations((0, 0), (0, 114.3), (88.9, 0), (88.9, 114.3)):
            Hole(F_1_4_CLEARANCE_HOLE1_D / 2)

    # Fillet1
    fillet1_edges = [part.edges().sort_by_distance(p)[0] for p in [
        (60.037562307, 20.681903014, 34.29),
        (-60.037562307, 20.681903014, 34.29),
        (-60.037562307, 20.681903014, -34.29),
        (60.037562307, 20.681903014, -34.29),
    ]]
    fillet(fillet1_edges, radius=FILLET1_R)

    # Sketch7 → Boss-Extrude3 (add)
    with BuildSketch(Plane(origin=(0, 0, -50.8), x_dir=(-1, 0, 0), z_dir=(0, 0, -1))):
        with Locations((0, 62.23)):
            Rectangle(SKETCH7_W, SKETCH7_H)
    extrude(amount=-BOSS_EXTRUDE3_DEPTH)

    # Fillet2
    fillet2_edges = [part.edges().sort_by_distance(p)[0] for p in [
        (-25.4, 58.198711326, 0),
        (25.4, 58.198711326, 0),
    ]]
    fillet(fillet2_edges, radius=FILLET2_R)

    # CBORE for 1/4 Socket Head Cap Screw1 out → CBORE for 1/4 Socket Head Cap Screw1 (cut)
    with BuildSketch(Plane(origin=(0, 0, 0), x_dir=(1, 0, 0), z_dir=(0, 1, 0)).offset(CBORE_START)):
        with Locations((-12.7, -38.1)):
            Circle(CBORE_FOR_1_4_SOCKET_HEAD_CAP_SCREW1_OUT_R)
        with Locations((12.7, -38.1)):
            Circle(CBORE_FOR_1_4_SOCKET_HEAD_CAP_SCREW1_OUT_R)
        with Locations((0, 38.1)):
            Circle(CBORE_FOR_1_4_SOCKET_HEAD_CAP_SCREW1_OUT_R)
    extrude(amount=CBORE_FOR_1_4_SOCKET_HEAD_CAP_SCREW1_DEPTH, mode=Mode.SUBTRACT)

    # CBORE for 1_4 Socket Head Cap Screw1 2 o → CBORE for 1_4 Socket Head Cap Screw1 2 (cut)
    with BuildSketch(Plane(origin=(0, 0, 0), x_dir=(1, 0, 0), z_dir=(0, 1, 0)).offset(CBORE_START_2)):
        with Locations((-12.7, -38.1)):
            Circle(CBORE_FOR_1_4_SOCKET_HEAD_CAP_SCREW1_2_O_R)
        with Locations((12.7, -38.1)):
            Circle(CBORE_FOR_1_4_SOCKET_HEAD_CAP_SCREW1_2_O_R)
        with Locations((0, 38.1)):
            Circle(CBORE_FOR_1_4_SOCKET_HEAD_CAP_SCREW1_2_O_R)
    extrude(amount=CBORE_FOR_1_4_SOCKET_HEAD_CAP_SCREW1_2_DEPTH, mode=Mode.SUBTRACT)


solid = part.part
